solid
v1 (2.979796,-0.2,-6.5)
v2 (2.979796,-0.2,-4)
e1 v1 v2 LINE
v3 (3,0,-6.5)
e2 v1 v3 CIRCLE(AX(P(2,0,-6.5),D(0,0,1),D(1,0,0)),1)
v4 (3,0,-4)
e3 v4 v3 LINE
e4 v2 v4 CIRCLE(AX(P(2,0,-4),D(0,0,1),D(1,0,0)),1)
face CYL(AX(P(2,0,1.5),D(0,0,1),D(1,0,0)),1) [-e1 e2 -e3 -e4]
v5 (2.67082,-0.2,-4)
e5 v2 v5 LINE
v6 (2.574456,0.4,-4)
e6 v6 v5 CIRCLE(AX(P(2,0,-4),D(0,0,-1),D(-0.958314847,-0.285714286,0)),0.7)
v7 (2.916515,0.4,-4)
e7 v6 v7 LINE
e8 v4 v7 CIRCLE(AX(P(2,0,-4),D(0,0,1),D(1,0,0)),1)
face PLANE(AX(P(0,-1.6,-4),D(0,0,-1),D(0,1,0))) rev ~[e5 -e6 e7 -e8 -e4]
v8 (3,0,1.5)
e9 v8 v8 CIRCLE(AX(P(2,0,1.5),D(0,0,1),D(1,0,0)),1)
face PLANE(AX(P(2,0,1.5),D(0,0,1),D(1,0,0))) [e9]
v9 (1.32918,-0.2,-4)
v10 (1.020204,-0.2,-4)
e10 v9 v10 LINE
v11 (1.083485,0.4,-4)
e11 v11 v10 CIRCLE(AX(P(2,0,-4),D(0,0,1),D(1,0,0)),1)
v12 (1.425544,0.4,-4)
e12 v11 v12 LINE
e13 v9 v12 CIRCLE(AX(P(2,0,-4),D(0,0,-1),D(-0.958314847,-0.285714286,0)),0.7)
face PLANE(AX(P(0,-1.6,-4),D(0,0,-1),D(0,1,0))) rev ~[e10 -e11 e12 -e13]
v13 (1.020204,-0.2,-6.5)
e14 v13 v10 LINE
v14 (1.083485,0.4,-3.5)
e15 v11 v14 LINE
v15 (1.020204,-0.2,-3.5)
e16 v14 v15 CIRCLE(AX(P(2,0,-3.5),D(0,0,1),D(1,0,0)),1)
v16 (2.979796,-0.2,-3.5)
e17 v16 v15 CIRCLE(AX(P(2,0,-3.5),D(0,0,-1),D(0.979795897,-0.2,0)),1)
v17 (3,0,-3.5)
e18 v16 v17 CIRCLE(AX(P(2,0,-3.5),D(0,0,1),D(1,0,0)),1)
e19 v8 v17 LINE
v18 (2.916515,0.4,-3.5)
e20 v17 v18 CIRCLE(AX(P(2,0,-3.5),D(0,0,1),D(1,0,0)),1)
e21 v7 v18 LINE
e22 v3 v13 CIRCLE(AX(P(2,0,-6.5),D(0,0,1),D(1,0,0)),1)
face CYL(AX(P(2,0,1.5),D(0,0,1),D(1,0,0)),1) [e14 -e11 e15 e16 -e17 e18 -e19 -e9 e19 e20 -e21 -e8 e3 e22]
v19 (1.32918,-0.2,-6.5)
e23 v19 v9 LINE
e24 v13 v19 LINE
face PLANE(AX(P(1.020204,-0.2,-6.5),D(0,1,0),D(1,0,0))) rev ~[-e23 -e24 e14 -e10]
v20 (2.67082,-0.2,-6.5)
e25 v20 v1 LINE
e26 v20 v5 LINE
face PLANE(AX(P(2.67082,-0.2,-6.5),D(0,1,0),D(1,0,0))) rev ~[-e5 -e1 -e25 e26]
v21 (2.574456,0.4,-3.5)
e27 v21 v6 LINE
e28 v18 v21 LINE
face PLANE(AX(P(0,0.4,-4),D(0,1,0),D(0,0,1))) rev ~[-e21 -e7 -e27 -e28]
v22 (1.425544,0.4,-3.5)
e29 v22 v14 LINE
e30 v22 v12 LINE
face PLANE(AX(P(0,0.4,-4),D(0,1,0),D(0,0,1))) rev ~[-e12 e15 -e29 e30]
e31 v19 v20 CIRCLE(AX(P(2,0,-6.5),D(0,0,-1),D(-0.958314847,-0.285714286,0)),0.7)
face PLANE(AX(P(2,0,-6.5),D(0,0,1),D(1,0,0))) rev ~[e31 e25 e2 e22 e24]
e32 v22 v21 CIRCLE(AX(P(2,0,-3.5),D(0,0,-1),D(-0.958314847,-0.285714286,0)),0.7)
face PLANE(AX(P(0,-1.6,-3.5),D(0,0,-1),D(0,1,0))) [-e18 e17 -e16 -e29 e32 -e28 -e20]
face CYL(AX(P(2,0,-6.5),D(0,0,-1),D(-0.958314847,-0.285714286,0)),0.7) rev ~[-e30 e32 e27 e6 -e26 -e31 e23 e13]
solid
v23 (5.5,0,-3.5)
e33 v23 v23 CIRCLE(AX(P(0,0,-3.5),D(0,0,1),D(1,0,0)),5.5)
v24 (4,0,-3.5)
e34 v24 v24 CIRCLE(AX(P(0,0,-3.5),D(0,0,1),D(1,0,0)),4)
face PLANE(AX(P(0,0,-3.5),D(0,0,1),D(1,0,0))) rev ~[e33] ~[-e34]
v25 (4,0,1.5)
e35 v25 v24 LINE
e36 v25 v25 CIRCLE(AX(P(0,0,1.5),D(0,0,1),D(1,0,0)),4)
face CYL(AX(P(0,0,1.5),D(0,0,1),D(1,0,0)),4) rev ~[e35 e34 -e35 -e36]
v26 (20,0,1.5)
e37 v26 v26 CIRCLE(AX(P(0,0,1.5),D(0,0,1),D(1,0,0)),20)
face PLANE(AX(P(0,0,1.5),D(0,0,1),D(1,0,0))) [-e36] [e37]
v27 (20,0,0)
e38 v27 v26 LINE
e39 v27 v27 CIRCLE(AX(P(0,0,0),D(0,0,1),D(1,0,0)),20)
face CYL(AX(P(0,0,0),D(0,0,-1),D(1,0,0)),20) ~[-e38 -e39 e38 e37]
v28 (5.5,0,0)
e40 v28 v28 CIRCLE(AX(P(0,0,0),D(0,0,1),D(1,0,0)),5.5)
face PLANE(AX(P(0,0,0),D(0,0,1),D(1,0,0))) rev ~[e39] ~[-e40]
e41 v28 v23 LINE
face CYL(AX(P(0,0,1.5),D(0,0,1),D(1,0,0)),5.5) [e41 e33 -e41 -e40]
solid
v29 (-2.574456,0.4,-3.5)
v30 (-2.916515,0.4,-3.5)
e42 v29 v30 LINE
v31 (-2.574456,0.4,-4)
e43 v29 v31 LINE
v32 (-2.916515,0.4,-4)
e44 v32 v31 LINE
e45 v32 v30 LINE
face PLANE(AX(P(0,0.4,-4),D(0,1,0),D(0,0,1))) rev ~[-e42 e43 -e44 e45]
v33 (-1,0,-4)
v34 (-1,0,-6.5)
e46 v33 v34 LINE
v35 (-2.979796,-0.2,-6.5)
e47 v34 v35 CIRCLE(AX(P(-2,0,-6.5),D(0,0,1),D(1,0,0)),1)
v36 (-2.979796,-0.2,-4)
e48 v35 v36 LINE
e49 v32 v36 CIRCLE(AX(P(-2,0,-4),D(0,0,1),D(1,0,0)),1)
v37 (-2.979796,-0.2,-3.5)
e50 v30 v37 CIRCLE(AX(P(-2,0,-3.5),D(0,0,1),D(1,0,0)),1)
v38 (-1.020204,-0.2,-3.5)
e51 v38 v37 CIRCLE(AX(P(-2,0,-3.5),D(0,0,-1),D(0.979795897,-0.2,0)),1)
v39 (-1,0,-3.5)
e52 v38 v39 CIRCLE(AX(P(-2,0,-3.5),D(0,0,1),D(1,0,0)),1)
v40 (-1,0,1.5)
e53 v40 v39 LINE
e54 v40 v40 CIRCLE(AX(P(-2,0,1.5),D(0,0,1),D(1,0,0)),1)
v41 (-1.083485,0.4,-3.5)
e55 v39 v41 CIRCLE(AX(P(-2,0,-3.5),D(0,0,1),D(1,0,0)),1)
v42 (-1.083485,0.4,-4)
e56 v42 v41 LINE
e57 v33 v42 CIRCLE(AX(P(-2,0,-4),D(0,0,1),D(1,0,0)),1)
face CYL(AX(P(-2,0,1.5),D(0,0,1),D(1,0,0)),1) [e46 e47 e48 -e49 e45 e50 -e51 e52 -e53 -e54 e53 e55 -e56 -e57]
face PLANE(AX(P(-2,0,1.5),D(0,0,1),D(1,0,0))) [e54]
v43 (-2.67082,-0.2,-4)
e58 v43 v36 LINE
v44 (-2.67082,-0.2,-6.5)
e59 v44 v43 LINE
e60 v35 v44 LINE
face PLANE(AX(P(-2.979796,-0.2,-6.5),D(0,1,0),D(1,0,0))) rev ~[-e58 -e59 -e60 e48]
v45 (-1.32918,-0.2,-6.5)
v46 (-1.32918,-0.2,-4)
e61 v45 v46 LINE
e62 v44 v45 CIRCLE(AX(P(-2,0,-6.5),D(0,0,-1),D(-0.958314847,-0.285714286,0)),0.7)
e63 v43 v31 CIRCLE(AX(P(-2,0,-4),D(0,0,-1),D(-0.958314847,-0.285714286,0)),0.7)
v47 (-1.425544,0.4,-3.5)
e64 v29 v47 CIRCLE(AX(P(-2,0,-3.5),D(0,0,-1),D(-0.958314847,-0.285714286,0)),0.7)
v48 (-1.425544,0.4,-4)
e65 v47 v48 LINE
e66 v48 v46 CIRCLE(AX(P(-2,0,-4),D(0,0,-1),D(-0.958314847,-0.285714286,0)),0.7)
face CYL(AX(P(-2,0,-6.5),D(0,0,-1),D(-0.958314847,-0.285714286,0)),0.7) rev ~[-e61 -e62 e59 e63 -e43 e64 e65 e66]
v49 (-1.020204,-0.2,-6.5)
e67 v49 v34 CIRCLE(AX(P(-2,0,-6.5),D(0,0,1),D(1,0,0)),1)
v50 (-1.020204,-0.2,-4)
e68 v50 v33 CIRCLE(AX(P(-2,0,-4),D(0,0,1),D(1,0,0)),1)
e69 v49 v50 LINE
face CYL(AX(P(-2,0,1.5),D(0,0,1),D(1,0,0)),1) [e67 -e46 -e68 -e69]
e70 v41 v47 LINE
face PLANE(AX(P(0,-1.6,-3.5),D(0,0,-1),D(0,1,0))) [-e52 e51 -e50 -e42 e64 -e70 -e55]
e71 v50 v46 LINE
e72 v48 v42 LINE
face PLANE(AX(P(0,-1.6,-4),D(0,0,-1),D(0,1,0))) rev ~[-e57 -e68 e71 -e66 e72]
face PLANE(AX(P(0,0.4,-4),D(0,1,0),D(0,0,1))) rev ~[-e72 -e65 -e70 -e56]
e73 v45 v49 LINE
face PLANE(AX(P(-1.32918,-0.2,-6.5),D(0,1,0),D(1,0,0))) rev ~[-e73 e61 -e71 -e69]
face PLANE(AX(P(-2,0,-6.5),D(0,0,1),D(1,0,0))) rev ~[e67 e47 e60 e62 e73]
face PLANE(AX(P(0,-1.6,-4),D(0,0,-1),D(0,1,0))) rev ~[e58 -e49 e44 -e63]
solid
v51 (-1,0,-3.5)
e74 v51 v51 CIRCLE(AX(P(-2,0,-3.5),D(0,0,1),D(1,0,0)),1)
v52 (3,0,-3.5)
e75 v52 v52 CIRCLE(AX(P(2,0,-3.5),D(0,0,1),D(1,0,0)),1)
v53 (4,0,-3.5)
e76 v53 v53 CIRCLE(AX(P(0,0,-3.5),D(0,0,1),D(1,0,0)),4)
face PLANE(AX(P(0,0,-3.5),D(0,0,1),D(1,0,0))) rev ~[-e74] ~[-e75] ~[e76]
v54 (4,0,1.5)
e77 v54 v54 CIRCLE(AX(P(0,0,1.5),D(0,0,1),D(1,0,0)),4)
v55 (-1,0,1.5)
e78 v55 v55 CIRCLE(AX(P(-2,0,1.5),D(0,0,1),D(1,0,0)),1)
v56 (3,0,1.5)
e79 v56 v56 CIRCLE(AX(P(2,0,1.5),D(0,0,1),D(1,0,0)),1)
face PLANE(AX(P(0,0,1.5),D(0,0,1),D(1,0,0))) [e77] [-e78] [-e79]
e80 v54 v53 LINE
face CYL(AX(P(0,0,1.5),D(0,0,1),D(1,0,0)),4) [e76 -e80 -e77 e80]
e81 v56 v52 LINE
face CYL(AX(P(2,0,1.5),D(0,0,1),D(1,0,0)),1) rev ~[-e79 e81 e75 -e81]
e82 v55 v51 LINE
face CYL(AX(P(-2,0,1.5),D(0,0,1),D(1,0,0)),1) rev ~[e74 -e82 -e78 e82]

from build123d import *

# Parameters (mm, degrees)
F0_R      = 20
F1_DEPTH  = 1.5
F2_R      = 5.5
F3_DEPTH  = 5
F4_R      = 4
F5_DEPTH  = 25
F6_R      = 4
F7_DEPTH  = 5
F8_R      = 1
F9_DEPTH  = 8
F11_DEPTH = 3
F12_DEPTH = 25
F13_W     = 2
F13_H     = 0.5
F14_DEPTH = 12.5


with BuildPart() as f1:
    # F0 (on Top) → F1 (new body)
    with BuildSketch(Plane.XY):
        Circle(F0_R)
    extrude(amount=F1_DEPTH)

    # F2 (on face) → F3 (join)
    with BuildSketch(Plane.XY.offset(1.5)):
        Circle(F2_R)
    extrude(amount=-F3_DEPTH)

    # F4 (on face) → F5 (cut)
    with BuildSketch(Plane.XY.offset(1.5)):
        Circle(F4_R)
    extrude(amount=-F5_DEPTH, mode=Mode.SUBTRACT)


with BuildPart() as f7:
    # F6 (on face) → F7 (new body)
    with BuildSketch(Plane.XY.offset(1.5)):
        Circle(F6_R)
    extrude(amount=-F7_DEPTH)

    # F8 (on face) → F12 (cut)
    with BuildSketch(Plane.XY.offset(1.5)):
        with Locations((-2, 0)):
            Circle(F8_R)
        with Locations((2, 0)):
            Circle(F8_R)
    extrude(amount=-F12_DEPTH, mode=Mode.SUBTRACT)


with BuildPart() as f9:
    # F8 (on face) → F9 (new body)
    with BuildSketch(Plane.XY.offset(1.5)):
        with Locations((-2, 0)):
            Circle(F8_R)
    extrude(amount=-F9_DEPTH)


with BuildPart() as f9b:
    # F8 (on face) → F9, piece 2 (new body)
    with BuildSketch(Plane.XY.offset(1.5)):
        with Locations((2, 0)):
            Circle(F8_R)
    extrude(amount=-F9_DEPTH)


with BuildPart() as f11_tool:
    # F10 (on face) → F11 (new body)
    with BuildSketch(Plane(origin=(0, 0, -6.5), x_dir=(1, 0, 0), z_dir=(0, 0, -1))):
        with BuildLine():
            Line((2.6708203932, 0.2), (2.9797958971, 0.2))
            ThreePointArc((2.9797958971, 0.2), (2, 1), (1.0202041029, 0.2))
            Line((1.0202041029, 0.2), (1.3291796068, 0.2))
            ThreePointArc((1.3291796068, 0.2), (2, -0.7), (2.6708203932, 0.2))
        make_face()
        with BuildLine():
            Line((-2.9797958971, 0.2), (-2.6708203932, 0.2))
            ThreePointArc((-2.6708203932, 0.2), (-2, -0.7), (-1.3291796068, 0.2))
            Line((-1.3291796068, 0.2), (-1.0202041029, 0.2))
            ThreePointArc((-1.0202041029, 0.2), (-2, 1), (-2.9797958971, 0.2))
        make_face()
    extrude(amount=-F11_DEPTH)


with BuildPart() as f9_1:
    add(f9.part)

    # F11: cut by f11_tool
    add(f11_tool.part, mode=Mode.SUBTRACT)


with BuildPart() as f9b_1:
    add(f9b.part)

    # F11: cut by f11_tool
    add(f11_tool.part, mode=Mode.SUBTRACT)


with BuildPart() as f14_tool:
    # F13 (on Right) → F14 (new body, symmetric)
    with BuildSketch(Plane.YZ):
        with Locations((-0.6, -3.75)):
            Rectangle(F13_W, F13_H)
    extrude(amount=F14_DEPTH, both=True)


with BuildPart() as f9_2:
    add(f9_1.part)

    # F14: cut by f14_tool
    add(f14_tool.part, mode=Mode.SUBTRACT)


with BuildPart() as f9b_2:
    add(f9b_1.part)

    # F14: cut by f14_tool
    add(f14_tool.part, mode=Mode.SUBTRACT)


solid = Compound([f1.part, f7.part, f9_2.part, f9b_2.part])
